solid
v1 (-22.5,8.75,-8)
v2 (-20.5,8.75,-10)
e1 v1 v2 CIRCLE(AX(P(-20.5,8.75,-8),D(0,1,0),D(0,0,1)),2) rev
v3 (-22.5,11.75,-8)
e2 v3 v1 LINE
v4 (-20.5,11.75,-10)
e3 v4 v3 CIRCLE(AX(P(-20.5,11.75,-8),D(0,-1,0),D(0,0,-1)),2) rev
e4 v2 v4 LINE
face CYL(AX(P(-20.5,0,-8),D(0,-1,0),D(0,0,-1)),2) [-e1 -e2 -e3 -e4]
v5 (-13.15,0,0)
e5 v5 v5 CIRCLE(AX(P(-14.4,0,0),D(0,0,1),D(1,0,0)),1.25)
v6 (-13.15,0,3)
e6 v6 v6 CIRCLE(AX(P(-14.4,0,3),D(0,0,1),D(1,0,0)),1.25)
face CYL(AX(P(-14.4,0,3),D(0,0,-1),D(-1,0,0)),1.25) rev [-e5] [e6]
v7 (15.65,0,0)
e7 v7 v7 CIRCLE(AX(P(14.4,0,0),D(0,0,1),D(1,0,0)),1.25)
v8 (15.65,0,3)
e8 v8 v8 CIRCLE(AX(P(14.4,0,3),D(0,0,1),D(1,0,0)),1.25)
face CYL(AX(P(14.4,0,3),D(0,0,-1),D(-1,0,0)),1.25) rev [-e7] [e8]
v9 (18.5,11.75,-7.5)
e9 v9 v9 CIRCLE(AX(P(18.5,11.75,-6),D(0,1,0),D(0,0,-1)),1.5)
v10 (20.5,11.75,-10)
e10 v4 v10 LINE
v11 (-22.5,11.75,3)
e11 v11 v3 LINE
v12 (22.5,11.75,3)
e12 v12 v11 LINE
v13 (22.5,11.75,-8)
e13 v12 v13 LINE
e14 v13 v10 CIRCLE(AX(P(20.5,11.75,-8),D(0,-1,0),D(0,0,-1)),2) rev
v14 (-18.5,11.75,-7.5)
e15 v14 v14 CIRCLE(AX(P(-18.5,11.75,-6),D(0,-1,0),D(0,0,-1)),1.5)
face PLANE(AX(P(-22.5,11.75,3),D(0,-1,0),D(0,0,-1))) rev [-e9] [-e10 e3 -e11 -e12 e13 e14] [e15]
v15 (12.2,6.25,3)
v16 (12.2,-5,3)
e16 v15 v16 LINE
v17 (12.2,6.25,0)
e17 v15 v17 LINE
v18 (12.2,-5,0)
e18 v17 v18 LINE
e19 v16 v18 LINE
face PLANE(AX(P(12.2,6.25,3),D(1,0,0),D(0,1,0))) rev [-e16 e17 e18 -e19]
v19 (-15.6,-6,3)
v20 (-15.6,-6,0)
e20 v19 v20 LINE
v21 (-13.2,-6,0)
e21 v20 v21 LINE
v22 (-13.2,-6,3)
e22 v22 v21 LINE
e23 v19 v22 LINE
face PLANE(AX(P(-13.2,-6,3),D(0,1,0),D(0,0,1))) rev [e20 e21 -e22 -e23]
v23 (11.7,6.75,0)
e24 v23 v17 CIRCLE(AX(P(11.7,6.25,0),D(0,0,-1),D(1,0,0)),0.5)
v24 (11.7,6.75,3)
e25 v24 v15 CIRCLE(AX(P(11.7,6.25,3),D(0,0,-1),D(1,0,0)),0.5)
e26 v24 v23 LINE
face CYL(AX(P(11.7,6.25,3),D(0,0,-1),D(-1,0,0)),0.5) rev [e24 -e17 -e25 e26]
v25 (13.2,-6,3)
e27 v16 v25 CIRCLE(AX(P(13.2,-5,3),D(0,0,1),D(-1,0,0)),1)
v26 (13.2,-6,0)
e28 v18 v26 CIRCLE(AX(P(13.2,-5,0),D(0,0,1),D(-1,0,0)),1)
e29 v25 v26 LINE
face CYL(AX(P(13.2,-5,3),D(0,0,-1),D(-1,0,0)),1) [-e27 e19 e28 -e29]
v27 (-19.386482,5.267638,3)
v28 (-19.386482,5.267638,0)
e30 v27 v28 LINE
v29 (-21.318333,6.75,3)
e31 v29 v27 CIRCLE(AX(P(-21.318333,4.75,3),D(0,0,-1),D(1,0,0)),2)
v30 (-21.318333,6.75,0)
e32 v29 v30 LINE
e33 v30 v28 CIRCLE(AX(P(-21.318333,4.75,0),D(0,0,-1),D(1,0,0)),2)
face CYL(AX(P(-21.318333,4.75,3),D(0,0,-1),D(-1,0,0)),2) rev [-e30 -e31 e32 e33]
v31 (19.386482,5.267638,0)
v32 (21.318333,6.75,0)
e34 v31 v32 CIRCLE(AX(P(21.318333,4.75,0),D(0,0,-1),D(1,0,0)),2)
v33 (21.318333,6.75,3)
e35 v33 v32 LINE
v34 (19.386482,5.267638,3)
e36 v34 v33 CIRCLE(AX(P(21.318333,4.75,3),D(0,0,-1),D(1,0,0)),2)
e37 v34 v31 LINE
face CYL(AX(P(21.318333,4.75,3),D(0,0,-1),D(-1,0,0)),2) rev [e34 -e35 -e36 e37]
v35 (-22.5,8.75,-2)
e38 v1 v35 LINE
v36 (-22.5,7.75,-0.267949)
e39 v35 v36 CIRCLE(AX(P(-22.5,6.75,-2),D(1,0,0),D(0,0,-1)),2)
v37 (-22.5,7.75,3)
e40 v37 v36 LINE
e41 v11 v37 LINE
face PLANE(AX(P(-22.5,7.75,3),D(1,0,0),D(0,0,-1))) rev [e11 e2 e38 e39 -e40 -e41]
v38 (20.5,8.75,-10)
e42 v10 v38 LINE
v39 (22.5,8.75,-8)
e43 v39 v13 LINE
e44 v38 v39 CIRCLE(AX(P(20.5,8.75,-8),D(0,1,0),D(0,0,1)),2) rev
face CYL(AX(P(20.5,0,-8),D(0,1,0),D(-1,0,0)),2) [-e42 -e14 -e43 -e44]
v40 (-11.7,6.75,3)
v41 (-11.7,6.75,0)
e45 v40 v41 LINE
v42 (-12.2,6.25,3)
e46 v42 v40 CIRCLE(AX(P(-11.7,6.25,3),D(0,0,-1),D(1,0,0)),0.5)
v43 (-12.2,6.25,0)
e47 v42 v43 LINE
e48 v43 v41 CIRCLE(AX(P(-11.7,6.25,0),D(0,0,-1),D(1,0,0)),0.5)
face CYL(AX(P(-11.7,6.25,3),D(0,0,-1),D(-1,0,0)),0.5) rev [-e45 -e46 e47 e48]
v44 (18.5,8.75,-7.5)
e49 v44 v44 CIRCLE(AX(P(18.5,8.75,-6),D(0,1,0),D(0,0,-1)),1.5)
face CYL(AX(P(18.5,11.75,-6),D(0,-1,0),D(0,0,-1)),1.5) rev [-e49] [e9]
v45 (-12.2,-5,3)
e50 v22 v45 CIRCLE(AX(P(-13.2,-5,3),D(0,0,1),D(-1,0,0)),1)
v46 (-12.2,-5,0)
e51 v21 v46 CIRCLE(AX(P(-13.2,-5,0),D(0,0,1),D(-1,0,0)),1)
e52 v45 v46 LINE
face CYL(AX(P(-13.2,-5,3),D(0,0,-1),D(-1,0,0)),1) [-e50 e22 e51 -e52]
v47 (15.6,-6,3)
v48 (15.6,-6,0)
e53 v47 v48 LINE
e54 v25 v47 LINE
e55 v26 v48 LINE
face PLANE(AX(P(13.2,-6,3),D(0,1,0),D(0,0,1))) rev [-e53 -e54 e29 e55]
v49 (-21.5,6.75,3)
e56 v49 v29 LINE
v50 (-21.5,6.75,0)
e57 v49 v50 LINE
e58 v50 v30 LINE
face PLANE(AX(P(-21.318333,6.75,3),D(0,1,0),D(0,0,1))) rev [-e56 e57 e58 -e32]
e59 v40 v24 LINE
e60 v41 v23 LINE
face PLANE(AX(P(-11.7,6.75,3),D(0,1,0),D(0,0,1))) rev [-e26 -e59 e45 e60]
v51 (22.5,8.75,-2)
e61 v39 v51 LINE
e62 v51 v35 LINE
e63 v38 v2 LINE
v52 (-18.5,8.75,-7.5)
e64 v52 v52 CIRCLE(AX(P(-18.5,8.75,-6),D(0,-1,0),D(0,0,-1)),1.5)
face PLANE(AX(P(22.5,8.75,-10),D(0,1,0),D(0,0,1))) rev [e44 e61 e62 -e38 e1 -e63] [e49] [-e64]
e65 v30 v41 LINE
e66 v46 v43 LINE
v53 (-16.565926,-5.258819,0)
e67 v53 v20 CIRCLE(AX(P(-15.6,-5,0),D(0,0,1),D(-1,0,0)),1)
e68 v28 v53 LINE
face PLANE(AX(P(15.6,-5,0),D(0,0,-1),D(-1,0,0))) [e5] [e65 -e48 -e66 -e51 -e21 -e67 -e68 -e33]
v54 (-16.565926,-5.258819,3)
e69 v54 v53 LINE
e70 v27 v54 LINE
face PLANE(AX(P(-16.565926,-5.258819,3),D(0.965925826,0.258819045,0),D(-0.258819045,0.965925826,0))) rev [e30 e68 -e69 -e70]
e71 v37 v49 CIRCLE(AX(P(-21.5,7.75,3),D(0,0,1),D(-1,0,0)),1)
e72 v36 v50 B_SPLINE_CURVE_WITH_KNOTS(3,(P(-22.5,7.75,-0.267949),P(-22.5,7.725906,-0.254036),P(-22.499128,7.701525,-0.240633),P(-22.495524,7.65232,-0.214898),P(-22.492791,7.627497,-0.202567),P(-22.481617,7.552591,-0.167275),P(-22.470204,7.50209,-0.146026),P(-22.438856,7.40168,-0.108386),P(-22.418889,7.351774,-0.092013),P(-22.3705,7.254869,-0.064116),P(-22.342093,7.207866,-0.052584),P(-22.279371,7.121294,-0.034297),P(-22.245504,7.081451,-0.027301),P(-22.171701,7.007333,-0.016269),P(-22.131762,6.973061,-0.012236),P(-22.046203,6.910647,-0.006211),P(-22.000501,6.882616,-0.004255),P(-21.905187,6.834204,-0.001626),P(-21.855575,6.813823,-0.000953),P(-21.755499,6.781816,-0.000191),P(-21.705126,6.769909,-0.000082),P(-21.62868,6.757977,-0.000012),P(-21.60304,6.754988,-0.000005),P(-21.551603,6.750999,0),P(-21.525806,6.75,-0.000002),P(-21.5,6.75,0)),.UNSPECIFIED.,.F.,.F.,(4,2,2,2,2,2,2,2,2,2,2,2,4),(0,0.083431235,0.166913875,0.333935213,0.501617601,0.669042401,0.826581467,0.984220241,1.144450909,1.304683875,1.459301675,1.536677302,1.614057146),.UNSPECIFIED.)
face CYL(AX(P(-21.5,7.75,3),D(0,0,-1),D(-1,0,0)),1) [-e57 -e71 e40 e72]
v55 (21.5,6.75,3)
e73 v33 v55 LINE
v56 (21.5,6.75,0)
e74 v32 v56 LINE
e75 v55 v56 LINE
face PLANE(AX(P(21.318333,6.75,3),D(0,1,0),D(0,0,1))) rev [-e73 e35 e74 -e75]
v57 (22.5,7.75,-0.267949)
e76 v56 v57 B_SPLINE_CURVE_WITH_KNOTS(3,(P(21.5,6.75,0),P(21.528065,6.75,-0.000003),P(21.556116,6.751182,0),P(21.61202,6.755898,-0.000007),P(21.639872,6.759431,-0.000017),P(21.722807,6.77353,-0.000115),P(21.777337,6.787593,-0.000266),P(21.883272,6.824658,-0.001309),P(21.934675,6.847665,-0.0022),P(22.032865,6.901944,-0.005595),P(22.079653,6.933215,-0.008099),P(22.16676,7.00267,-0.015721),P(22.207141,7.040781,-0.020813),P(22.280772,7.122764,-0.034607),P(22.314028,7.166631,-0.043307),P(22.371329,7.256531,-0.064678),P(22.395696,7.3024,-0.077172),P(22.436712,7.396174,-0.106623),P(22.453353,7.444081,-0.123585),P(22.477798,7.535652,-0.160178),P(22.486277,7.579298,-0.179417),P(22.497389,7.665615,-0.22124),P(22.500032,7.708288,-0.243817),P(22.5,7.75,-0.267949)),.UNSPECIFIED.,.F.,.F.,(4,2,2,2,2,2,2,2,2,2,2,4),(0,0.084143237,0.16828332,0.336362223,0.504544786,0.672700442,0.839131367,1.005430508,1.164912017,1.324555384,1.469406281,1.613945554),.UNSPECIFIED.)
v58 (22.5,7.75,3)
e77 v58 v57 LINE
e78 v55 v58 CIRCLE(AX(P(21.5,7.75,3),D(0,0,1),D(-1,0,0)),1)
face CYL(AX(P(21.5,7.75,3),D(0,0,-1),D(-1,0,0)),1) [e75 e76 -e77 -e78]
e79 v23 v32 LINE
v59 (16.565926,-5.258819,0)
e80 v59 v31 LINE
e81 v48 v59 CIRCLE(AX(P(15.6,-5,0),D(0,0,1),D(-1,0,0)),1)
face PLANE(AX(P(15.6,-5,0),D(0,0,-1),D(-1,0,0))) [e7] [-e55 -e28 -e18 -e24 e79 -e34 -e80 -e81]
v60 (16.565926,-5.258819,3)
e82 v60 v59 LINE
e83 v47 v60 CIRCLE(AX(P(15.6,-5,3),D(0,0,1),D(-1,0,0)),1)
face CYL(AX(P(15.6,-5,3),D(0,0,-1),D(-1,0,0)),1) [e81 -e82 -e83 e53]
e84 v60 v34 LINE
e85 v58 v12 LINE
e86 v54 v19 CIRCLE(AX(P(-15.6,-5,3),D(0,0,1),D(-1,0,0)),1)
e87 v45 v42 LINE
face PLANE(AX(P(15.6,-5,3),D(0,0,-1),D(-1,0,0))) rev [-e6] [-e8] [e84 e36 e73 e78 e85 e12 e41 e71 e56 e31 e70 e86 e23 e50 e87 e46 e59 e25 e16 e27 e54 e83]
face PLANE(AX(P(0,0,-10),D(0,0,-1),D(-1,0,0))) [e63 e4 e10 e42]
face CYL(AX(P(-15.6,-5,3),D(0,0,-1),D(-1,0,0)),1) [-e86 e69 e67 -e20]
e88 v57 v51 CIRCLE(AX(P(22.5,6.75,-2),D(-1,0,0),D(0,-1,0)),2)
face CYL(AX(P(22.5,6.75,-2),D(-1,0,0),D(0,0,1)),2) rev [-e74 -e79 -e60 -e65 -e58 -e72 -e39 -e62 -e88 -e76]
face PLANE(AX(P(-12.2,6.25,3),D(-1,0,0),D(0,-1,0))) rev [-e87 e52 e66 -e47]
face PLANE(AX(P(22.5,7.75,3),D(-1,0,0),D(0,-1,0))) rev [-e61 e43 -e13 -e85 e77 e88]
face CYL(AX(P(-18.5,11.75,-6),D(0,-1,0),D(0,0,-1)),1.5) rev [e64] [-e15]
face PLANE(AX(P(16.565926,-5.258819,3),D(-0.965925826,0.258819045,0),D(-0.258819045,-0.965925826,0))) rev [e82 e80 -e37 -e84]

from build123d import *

# Parameters (mm, degrees)
SKETCH3_R           = 1.25
BOSS_EXTRUDE1_DEPTH = 3
SKETCH4_W           = 45
SKETCH4_H           = 3
BOSS_EXTRUDE2_DEPTH = 10
FILLET1_R           = 2
FILLET2_R           = 2
SKETCH5_R           = 1.5
CUT_EXTRUDE1_DEPTH  = 29.702134145


with BuildPart() as part:
    # Sketch3 → Boss-Extrude1 (new body)
    with BuildSketch(Plane.XY):
        with BuildLine():
            Line((-12.2, 6.25), (-12.2, -5))
            ThreePointArc((-12.2, -5), (-12.492893219, -5.707106781), (-13.2, -6))
            Line((-13.2, -6), (-15.6, -6))
            ThreePointArc((-15.6, -6), (-16.208761429, -5.79335334), (-16.565925826, -5.258819045))
            Line((-16.565925826, -5.258819045), (-19.386481515, 5.26763809))
            ThreePointArc((-19.386481515, 5.26763809), (-20.100810309, 6.336706681), (-21.318333167, 6.75))
            Line((-21.318333167, 6.75), (-21.5, 6.75))
            ThreePointArc((-21.5, 6.75), (-22.207106781, 7.042893219), (-22.5, 7.75))
            Line((-22.5, 7.75), (-22.5, 11.75))
            Line((-22.5, 11.75), (22.5, 11.75))
            Line((22.5, 11.75), (22.5, 7.75))
            ThreePointArc((22.5, 7.75), (22.207106781, 7.042893219), (21.5, 6.75))
            Line((21.5, 6.75), (21.318333167, 6.75))
            ThreePointArc((21.318333167, 6.75), (20.100810309, 6.336706681), (19.386481515, 5.26763809))
            Line((19.386481515, 5.26763809), (16.565925826, -5.258819045))
            ThreePointArc((16.565925826, -5.258819045), (16.208761429, -5.79335334), (15.6, -6))
            Line((15.6, -6), (13.2, -6))
            ThreePointArc((13.2, -6), (12.492893219, -5.707106781), (12.2, -5))
            Line((12.2, -5), (12.2, 6.25))
            ThreePointArc((12.2, 6.25), (12.053553391, 6.603553391), (11.7, 6.75))
            Line((11.7, 6.75), (-11.7, 6.75))
            ThreePointArc((-11.7, 6.75), (-12.053553391, 6.603553391), (-12.2, 6.25))
        make_face()
        with Locations((-14.4, 0)):
            Circle(SKETCH3_R, mode=Mode.SUBTRACT)
        with Locations((14.4, 0)):
            Circle(SKETCH3_R, mode=Mode.SUBTRACT)
    extrude(amount=BOSS_EXTRUDE1_DEPTH)

    # Sketch4 → Boss-Extrude2 (add)
    with BuildSketch(Plane(origin=(0, 0, 0), x_dir=(-1, 0, 0), z_dir=(0, 0, -1))):
        with Locations((0, 10.25)):
            Rectangle(SKETCH4_W, SKETCH4_H)
    extrude(amount=BOSS_EXTRUDE2_DEPTH)

    # Fillet1
    fillet1_edges = [part.edges().sort_by_distance(p)[0] for p in [
        (0, 8.75, 0),
    ]]
    fillet(fillet1_edges, radius=FILLET1_R - 0.0001)  # a hair under: the kernel refuses the full size

    # Fillet2
    fillet2_edges = [part.edges().sort_by_distance(p)[0] for p in [
        (22.5, 10.25, -10),
        (-22.5, 10.25, -10),
    ]]
    fillet(fillet2_edges, radius=FILLET2_R)

    # Sketch5 → Cut-Extrude1 (cut, through all)
    with BuildSketch(Plane.XZ.offset(-8.75)):
        with Locations(Location((-18.5, -6, 0), (0, 0, 270))):
            Circle(SKETCH5_R)
    cut_extrude1 = extrude(amount=-CUT_EXTRUDE1_DEPTH, mode=Mode.SUBTRACT)

    # Mirror1: Cut-Extrude1 across plane
    add(cut_extrude1.mirror(Plane(origin=(0, 0, 0), x_dir=(0, 0, 1), z_dir=(1, 0, 0))), mode=Mode.SUBTRACT)


solid = part.part
